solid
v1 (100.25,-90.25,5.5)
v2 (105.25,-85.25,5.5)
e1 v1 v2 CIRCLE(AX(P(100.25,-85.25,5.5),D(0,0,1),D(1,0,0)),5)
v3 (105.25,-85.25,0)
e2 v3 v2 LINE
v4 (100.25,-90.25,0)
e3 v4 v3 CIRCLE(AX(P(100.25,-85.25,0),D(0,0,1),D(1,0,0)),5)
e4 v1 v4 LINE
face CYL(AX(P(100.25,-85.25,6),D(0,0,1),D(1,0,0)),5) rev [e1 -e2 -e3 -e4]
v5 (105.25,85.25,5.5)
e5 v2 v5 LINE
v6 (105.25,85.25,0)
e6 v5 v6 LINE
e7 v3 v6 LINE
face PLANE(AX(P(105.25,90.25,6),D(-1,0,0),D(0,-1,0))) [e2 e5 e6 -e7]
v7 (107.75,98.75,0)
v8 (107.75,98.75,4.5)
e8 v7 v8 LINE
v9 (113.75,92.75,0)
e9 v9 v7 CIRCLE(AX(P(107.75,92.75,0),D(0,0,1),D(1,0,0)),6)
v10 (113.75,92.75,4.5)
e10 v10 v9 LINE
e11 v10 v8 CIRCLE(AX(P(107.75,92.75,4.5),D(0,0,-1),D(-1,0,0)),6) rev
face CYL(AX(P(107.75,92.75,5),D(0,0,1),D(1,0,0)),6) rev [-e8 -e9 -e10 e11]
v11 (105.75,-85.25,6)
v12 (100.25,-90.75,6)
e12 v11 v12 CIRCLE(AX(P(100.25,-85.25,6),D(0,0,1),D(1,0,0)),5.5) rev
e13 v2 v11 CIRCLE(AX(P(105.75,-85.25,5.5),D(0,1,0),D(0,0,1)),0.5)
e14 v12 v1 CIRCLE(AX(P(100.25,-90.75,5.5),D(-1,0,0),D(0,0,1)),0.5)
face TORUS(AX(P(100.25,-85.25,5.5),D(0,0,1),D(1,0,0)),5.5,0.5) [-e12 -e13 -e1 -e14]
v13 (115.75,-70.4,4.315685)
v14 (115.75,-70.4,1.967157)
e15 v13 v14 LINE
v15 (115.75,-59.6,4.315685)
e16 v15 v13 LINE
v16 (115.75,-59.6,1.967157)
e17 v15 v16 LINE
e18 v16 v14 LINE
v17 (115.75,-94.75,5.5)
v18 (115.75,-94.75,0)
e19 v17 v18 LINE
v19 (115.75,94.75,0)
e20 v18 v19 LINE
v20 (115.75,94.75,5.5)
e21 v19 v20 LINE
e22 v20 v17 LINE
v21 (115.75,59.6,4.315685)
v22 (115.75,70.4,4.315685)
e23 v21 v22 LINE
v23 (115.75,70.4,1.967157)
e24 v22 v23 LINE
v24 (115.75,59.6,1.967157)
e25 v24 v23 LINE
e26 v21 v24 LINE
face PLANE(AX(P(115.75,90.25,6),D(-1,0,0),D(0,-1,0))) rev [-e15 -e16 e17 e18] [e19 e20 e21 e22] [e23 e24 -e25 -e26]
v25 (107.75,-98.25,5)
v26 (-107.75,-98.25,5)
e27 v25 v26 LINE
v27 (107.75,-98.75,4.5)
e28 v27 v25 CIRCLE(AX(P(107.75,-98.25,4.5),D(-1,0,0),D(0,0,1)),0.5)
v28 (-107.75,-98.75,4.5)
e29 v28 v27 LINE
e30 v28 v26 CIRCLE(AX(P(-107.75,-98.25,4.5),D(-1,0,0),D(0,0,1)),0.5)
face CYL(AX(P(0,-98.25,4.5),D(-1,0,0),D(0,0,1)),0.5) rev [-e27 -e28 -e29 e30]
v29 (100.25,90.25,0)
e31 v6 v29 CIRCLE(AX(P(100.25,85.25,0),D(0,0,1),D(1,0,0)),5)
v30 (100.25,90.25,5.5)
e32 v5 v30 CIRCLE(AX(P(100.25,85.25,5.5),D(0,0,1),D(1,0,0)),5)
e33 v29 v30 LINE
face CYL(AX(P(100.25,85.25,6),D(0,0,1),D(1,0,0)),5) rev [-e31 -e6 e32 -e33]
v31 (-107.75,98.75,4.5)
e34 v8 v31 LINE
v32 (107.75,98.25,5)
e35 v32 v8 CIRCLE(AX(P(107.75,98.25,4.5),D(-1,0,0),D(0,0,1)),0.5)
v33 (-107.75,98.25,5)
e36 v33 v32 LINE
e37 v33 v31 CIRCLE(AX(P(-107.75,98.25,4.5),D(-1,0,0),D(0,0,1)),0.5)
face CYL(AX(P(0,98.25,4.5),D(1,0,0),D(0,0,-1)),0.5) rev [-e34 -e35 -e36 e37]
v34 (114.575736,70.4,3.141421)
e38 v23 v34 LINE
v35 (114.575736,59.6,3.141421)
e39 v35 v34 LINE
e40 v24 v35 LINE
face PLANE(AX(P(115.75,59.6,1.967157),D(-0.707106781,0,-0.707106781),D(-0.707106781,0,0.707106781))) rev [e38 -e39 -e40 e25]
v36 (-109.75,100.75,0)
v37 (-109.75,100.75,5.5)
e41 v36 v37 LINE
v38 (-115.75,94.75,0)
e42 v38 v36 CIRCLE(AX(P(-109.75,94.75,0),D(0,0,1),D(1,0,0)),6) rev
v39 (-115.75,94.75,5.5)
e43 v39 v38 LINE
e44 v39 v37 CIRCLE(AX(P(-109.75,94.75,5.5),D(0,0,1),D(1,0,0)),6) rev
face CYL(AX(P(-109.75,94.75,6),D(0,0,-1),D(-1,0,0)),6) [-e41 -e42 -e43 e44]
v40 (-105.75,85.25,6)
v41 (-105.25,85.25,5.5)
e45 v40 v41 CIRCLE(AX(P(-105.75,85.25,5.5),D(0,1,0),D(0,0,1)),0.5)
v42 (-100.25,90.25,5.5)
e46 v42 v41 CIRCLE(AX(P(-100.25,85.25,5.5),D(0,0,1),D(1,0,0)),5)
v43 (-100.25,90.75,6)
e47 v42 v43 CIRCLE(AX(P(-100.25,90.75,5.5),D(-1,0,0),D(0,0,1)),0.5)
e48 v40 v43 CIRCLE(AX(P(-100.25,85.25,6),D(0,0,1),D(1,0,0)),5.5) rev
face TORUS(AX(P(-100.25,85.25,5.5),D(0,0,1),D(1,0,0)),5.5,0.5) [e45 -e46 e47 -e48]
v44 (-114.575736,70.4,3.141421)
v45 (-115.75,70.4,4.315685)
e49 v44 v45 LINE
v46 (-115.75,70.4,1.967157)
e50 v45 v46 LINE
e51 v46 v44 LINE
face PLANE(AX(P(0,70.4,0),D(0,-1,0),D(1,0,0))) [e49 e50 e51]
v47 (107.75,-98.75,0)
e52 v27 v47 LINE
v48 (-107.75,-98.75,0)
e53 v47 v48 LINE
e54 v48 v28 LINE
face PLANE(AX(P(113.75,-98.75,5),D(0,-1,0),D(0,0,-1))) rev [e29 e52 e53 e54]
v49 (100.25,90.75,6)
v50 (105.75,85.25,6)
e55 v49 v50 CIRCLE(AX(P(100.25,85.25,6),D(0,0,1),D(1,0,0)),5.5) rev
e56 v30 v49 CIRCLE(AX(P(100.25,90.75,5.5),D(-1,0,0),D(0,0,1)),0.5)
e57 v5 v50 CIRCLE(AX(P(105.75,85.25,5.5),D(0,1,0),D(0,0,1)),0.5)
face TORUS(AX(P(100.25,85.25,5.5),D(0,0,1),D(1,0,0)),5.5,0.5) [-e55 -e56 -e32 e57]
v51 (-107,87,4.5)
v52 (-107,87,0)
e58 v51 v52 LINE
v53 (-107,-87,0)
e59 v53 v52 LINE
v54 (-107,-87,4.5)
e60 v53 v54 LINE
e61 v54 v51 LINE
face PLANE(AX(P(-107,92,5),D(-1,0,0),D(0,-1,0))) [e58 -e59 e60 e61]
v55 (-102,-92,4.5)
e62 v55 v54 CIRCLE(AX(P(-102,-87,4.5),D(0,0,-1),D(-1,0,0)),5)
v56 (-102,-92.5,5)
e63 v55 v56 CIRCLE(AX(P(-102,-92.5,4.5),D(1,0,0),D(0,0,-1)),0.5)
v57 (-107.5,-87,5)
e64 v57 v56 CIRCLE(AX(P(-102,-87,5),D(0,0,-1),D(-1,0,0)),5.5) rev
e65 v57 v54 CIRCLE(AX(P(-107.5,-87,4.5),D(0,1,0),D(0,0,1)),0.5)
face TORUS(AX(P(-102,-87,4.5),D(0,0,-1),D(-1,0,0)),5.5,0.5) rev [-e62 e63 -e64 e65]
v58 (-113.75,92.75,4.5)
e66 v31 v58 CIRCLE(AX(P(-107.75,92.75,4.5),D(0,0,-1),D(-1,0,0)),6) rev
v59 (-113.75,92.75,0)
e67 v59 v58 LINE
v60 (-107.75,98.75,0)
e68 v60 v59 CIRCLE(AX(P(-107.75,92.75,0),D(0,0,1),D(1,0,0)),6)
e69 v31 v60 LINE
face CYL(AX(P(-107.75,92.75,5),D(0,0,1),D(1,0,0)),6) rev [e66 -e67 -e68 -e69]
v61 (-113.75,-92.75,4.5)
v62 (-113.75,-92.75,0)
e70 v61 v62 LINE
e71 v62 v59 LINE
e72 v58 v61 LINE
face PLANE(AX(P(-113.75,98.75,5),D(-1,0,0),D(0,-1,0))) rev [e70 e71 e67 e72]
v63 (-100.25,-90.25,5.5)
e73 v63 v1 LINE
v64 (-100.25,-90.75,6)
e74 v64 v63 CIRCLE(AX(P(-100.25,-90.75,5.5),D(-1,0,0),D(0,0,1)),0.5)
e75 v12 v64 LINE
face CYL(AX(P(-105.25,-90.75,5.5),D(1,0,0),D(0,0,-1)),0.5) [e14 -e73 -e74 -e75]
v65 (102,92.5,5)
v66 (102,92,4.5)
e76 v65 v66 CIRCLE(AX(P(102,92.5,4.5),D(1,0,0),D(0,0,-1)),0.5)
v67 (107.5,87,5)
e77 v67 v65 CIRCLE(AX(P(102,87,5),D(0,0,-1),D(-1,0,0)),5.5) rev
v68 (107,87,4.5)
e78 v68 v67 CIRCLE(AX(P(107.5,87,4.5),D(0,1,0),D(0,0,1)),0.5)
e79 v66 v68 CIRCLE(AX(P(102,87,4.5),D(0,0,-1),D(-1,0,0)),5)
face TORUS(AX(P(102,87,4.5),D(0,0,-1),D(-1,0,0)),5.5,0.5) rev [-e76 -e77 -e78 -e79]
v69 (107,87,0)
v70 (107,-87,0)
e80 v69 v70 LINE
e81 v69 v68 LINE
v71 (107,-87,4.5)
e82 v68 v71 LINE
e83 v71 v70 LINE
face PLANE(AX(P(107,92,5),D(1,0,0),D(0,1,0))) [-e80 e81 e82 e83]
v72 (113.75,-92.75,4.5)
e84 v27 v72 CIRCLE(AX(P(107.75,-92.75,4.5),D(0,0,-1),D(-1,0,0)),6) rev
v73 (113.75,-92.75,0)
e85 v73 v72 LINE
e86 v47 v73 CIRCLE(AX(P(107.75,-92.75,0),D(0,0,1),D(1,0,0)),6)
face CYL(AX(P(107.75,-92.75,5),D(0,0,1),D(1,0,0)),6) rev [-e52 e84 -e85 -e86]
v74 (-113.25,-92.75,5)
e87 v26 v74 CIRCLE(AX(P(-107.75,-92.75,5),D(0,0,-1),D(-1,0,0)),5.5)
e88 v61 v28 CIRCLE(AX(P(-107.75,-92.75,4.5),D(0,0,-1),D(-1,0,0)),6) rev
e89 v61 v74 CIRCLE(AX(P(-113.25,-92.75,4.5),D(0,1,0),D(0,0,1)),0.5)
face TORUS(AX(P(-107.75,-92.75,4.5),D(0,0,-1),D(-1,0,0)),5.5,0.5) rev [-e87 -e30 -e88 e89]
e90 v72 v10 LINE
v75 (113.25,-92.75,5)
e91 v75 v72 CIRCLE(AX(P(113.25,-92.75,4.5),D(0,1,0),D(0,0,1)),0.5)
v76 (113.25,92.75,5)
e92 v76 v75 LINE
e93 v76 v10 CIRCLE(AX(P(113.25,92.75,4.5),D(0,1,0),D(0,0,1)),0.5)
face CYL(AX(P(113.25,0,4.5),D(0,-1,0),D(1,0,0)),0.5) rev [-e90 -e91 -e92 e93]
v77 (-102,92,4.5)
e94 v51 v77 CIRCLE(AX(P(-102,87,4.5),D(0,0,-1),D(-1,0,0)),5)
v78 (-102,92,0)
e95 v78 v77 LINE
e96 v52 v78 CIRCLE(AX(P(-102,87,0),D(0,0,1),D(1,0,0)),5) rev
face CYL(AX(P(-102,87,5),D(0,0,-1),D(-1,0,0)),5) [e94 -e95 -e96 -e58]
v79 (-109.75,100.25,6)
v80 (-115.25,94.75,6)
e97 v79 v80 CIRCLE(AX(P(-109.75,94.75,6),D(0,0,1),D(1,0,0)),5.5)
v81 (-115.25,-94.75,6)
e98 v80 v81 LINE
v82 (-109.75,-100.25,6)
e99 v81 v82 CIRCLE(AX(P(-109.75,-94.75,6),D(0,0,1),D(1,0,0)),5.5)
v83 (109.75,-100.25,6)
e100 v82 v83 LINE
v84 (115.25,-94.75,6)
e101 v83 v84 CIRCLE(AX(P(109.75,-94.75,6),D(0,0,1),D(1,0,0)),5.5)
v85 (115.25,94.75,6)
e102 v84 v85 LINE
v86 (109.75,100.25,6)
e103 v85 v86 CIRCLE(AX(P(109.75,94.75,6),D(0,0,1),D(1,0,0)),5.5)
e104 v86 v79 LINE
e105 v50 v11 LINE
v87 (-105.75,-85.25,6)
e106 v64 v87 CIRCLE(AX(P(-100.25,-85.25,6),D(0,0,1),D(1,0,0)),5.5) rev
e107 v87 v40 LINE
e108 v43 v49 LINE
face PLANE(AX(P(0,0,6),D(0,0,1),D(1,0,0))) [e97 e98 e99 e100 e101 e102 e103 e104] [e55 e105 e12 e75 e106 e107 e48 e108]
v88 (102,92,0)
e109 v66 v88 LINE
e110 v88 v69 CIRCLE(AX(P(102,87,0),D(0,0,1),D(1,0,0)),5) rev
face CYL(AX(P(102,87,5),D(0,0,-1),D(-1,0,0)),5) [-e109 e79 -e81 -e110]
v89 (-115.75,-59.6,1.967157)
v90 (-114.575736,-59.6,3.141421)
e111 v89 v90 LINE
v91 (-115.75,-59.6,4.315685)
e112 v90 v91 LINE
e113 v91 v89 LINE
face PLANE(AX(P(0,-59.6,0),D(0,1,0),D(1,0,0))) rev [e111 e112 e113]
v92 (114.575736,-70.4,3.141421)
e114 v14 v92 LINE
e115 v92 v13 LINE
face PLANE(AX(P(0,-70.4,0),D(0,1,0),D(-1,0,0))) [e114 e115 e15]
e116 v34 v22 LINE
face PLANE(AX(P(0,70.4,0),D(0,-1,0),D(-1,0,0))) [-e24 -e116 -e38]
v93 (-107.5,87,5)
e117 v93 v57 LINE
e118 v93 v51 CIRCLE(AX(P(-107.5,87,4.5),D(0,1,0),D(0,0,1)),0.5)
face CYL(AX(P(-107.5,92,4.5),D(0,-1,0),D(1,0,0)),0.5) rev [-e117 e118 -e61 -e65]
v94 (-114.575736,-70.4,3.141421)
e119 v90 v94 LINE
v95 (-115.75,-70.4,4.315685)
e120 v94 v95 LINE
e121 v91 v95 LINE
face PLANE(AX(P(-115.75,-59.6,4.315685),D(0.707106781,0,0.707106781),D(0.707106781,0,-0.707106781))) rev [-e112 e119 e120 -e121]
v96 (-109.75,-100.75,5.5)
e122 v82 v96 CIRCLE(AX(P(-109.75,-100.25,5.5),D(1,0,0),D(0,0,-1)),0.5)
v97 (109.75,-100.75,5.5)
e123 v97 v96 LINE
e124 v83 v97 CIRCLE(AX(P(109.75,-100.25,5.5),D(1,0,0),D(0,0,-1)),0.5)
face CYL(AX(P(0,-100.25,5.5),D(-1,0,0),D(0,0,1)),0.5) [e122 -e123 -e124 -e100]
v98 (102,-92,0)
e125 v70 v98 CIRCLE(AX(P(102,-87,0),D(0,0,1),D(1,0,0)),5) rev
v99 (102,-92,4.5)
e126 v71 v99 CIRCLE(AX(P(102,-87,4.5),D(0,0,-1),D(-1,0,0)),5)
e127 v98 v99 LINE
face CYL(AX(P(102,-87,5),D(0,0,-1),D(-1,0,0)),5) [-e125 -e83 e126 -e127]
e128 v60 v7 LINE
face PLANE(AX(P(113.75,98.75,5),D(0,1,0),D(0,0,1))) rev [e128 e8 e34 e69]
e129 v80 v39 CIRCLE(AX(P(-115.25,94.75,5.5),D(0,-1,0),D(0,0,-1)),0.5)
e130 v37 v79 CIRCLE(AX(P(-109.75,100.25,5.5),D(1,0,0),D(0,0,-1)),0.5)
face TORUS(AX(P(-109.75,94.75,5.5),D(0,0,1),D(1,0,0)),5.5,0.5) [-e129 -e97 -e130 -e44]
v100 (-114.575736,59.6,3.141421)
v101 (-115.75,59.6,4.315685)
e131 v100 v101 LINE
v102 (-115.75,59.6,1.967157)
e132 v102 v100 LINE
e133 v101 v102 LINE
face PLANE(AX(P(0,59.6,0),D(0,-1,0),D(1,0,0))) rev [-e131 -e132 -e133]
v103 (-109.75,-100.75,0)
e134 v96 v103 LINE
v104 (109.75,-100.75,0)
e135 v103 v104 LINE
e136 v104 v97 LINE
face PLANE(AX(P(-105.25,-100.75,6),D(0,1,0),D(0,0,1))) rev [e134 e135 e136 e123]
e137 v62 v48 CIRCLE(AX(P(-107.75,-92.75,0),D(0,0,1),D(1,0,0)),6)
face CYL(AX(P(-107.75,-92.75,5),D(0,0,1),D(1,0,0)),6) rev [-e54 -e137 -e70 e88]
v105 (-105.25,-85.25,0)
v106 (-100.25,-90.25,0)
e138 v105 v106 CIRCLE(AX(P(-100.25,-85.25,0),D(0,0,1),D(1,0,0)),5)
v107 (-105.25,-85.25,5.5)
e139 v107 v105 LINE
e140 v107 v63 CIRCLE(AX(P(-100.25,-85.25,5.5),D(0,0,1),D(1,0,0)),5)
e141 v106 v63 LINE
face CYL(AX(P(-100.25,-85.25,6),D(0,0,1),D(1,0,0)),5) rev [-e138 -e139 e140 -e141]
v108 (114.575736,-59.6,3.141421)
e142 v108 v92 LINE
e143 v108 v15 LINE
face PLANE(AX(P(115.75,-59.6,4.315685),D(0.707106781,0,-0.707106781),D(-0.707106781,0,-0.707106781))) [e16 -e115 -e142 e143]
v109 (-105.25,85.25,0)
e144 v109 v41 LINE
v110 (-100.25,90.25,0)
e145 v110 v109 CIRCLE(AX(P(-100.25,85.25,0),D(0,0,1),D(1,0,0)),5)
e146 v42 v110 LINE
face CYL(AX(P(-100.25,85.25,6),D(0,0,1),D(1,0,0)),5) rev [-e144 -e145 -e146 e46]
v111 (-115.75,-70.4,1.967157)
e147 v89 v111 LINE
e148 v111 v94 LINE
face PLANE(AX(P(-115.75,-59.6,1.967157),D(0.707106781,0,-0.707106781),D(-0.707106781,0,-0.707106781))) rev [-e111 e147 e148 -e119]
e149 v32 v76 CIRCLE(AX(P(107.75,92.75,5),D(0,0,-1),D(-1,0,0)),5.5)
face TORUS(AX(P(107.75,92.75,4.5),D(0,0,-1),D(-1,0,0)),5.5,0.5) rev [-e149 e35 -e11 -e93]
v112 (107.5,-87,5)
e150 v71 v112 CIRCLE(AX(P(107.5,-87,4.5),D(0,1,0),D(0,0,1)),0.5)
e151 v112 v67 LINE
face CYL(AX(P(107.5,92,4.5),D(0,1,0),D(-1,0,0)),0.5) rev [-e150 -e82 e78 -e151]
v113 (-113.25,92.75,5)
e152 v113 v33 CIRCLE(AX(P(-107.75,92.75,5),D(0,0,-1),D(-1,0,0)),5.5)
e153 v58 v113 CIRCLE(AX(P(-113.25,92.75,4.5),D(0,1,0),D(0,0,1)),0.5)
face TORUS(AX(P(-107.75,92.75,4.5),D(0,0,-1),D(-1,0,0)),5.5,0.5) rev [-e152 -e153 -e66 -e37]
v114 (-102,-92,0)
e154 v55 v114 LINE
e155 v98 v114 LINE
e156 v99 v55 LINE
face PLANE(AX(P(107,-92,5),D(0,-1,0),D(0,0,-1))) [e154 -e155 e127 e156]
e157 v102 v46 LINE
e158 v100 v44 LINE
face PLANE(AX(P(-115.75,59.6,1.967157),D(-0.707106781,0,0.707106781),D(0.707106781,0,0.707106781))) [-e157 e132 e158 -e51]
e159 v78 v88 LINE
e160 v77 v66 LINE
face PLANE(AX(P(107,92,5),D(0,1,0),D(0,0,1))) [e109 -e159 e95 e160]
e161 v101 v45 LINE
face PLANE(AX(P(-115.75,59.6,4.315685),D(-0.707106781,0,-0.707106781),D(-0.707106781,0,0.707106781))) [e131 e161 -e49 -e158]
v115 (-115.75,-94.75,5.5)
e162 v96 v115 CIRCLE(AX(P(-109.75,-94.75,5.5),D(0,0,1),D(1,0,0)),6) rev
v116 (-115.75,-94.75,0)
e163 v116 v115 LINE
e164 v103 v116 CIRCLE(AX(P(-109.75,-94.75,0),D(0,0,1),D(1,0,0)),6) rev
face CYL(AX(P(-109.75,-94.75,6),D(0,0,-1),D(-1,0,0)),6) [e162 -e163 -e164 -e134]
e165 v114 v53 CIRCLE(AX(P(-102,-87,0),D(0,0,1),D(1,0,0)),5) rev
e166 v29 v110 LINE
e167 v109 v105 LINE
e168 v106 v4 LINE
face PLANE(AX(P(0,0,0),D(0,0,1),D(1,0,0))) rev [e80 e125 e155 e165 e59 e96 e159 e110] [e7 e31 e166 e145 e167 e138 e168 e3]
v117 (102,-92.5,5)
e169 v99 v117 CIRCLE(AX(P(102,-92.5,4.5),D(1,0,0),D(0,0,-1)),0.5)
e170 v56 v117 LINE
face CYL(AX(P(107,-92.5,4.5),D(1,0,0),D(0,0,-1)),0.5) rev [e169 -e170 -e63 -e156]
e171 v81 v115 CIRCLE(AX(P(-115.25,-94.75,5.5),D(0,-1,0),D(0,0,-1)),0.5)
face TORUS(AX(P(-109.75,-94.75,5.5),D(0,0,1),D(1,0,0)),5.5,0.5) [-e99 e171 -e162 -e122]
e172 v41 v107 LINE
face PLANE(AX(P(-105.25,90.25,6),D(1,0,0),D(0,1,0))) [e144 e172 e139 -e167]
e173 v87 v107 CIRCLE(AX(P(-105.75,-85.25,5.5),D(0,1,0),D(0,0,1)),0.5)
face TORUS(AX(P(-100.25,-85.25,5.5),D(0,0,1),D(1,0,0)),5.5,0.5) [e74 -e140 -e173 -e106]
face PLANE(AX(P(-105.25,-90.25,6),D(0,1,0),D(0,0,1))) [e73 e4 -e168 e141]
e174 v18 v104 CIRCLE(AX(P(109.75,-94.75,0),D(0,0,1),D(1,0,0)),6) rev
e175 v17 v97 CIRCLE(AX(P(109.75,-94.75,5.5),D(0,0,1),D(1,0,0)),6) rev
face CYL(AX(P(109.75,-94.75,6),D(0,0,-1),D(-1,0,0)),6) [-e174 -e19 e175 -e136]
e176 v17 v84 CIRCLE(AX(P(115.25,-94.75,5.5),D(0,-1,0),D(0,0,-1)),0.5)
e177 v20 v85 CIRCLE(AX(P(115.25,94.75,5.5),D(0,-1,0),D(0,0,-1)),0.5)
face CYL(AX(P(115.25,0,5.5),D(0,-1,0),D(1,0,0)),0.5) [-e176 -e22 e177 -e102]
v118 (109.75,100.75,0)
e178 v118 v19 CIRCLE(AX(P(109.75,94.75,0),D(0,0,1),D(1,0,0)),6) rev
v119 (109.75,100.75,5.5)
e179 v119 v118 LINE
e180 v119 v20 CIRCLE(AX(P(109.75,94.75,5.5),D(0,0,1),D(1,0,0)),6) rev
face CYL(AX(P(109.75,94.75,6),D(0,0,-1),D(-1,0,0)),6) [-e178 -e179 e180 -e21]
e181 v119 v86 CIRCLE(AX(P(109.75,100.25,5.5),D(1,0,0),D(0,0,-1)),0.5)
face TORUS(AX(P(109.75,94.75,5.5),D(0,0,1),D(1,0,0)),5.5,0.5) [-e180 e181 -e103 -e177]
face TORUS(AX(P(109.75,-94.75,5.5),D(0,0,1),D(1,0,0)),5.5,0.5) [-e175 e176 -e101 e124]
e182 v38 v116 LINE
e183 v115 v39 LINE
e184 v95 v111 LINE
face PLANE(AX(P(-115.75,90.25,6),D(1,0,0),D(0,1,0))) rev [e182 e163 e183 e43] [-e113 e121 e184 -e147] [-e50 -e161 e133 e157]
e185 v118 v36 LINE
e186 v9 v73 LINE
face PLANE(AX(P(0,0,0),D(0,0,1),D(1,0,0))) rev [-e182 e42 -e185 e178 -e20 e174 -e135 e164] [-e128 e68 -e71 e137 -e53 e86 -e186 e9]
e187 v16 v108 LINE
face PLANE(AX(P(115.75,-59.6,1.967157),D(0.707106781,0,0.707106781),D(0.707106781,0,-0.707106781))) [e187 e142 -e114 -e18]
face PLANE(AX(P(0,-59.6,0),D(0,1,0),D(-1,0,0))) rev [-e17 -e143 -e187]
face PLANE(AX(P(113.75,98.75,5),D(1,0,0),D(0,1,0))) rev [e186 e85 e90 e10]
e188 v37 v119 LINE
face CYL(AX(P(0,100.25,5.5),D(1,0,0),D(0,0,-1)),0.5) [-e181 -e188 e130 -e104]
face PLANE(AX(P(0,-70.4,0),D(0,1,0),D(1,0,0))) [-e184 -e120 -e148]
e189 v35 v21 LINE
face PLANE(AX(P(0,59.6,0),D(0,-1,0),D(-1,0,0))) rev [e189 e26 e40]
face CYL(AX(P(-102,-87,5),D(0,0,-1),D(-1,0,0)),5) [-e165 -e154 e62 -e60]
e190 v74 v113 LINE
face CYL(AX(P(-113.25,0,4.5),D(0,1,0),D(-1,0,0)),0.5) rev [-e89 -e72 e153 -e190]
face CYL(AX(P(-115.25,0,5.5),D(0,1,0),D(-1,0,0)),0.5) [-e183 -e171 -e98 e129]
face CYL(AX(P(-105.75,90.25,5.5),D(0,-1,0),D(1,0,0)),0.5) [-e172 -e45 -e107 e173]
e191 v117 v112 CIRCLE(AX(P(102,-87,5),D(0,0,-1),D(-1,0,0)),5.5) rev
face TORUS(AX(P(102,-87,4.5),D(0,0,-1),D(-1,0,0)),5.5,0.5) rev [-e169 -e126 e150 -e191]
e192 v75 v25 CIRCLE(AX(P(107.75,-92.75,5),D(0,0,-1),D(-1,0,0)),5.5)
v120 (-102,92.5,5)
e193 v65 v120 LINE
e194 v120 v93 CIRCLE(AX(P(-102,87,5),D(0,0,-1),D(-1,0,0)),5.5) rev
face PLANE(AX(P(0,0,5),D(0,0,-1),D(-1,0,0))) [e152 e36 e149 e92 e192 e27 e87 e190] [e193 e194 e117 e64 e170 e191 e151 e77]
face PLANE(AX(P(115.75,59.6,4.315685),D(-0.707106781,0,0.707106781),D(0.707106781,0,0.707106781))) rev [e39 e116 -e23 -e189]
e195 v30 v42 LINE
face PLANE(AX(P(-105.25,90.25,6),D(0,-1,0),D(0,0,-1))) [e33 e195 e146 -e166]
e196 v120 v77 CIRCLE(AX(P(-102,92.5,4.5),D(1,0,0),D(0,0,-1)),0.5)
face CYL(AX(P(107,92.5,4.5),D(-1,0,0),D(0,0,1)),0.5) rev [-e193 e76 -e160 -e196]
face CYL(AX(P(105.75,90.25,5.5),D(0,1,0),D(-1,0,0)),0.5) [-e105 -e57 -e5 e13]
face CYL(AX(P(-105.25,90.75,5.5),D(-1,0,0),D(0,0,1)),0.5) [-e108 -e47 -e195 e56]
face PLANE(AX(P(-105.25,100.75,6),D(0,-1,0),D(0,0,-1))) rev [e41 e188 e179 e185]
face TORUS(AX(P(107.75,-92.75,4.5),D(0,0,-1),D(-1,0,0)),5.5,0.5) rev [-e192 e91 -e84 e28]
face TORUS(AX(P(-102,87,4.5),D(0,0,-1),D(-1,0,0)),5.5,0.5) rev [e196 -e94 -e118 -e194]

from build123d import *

# Parameters (mm, degrees)
SKETCH1_W                                = 231.5
SKETCH1_H                                = 201.5
SKETCH1_W_2                              = 210.5
SKETCH1_H_2                              = 180.5
MAIN_BODY_DEPTH                          = 6
FILLET1_R                                = 5
FILLET2_R                                = 6
SKETCH3_W                                = 227.5
SKETCH3_H                                = 197.5
SKETCH3_W_2                              = 214
SKETCH3_H_2                              = 184
MAIN_CAVITY_DEPTH                        = 5
FILLET6_R                                = 6
FILLET4_R                                = 5
CAVITY1_START                            = 83.43860018
CAVITY1_OUTLINE_W                        = 1.804040507
CAVITY1_OUTLINE_H                        = 10
CAVITY1_DEPTH                            = 1.060660172
CAVITY1_START_2                          = -80.256619665
CAVITY1_2_OUTLINE_W                      = 1.56139982
CAVITY1_2_OUTLINE_H                      = 10
CAVITY1_2_DEPTH                          = 1.060660172
SNAP_START                               = -0.4
SNAP_FIT_DEPTH                           = 10.8
MIRROR1_START                            = -0.4
MIRROR1_AT_THE_SECOND_PLANE_COPY_1_DEPTH = 10.8
FILLET7_R                                = 0.5


# Read off the part's stored shape, not the designer's step: Cavity1
with BuildPart() as part:
    # Sketch1 → Main Body (new body)
    with BuildSketch(Plane.XY):
        Rectangle(SKETCH1_W, SKETCH1_H)
        Rectangle(SKETCH1_W_2, SKETCH1_H_2, mode=Mode.SUBTRACT)
    extrude(amount=MAIN_BODY_DEPTH)

    # Fillet1
    fillet1_edges = [part.edges().sort_by_distance(p)[0] for p in [
        (105.25, -90.25, 3),
        (105.25, 90.25, 3),
        (-105.25, 90.25, 3),
        (-105.25, -90.25, 3),
    ]]
    fillet(fillet1_edges, radius=FILLET1_R)

    # Fillet2
    fillet2_edges = [part.edges().sort_by_distance(p)[0] for p in [
        (115.75, -100.75, 3),
        (-115.75, -100.75, 3),
        (-115.75, 100.75, 3),
        (115.75, 100.75, 3),
    ]]
    fillet(fillet2_edges, radius=FILLET2_R)

    # Sketch3 → Main Cavity (cut)
    with BuildSketch(Plane(origin=(0, 0, 0), x_dir=(-1, 0, 0), z_dir=(0, 0, -1))):
        Rectangle(SKETCH3_W, SKETCH3_H)
        Rectangle(SKETCH3_W_2, SKETCH3_H_2, mode=Mode.SUBTRACT)
    extrude(amount=-MAIN_CAVITY_DEPTH, mode=Mode.SUBTRACT)

    # Fillet6
    fillet6_edges = [part.edges().sort_by_distance(p)[0] for p in [
        (-113.75, 98.75, 2.5),
        (-113.75, -98.75, 2.5),
        (113.75, -98.75, 2.5),
        (113.75, 98.75, 2.5),
    ]]
    fillet(fillet6_edges, radius=FILLET6_R)

    # Fillet4
    fillet4_edges = [part.edges().sort_by_distance(p)[0] for p in [
        (-107, -92, 2.5),
        (107, -92, 2.5),
        (107, 92, 2.5),
        (-107, 92, 2.5),
    ]]
    fillet(fillet4_edges, radius=FILLET4_R)

    # Cavity1 outline → Cavity1 (cut)
    with BuildSketch(Plane(origin=(0, 0, 0), x_dir=(0.7071067811865474, 0, -0.7071067811865477), z_dir=(0.7071067811865476, 0, 0.7071067811865476)).offset(CAVITY1_START)):
        with Locations((80.097979747, 65)):
            Rectangle(CAVITY1_OUTLINE_W, CAVITY1_OUTLINE_H)
        with Locations((80.097979747, -65)):
            Rectangle(CAVITY1_OUTLINE_W, CAVITY1_OUTLINE_H)
    extrude(amount=CAVITY1_DEPTH, mode=Mode.SUBTRACT)

    # Cavity1 2 outline → Cavity1 2 (cut)
    with BuildSketch(Plane(origin=(0, 0, 0), x_dir=(0.7071067811865474, 0, -0.7071067811865477), z_dir=(0.7071067811865476, 0, 0.7071067811865476)).offset(CAVITY1_START_2)):
        with Locations((-84.21930009, 65)):
            Rectangle(CAVITY1_2_OUTLINE_W, CAVITY1_2_OUTLINE_H)
        with Locations((-84.21930009, -65)):
            Rectangle(CAVITY1_2_OUTLINE_W, CAVITY1_2_OUTLINE_H)
    extrude(amount=CAVITY1_2_DEPTH, mode=Mode.SUBTRACT)

    # Sketch4 → Snap Fit (cut)
    with BuildSketch(Plane.XZ.offset(-70).offset(SNAP_START)):
        Polygon((-115.75, 4.315685425), (-114.575735931, 3.141421356), (-115.75, 1.967157288), align=None)
    snap_fit = extrude(amount=SNAP_FIT_DEPTH, mode=Mode.SUBTRACT)

    # Mirror1: Snap Fit across plane
    add(snap_fit.mirror(Plane.ZX), mode=Mode.SUBTRACT)

    # Mirror1 at the second plane: Snap Fit across plane
    add(snap_fit.mirror(Plane(origin=(0, 0, 0), x_dir=(0, 0, 1), z_dir=(1, 0, 0))), mode=Mode.SUBTRACT)

    # Mirror1 at the second plane copy 1 sketc → Mirror1 at the second plane copy 1 (cut)
    with BuildSketch(Plane(origin=(0, -70, 0), x_dir=(-1, 0, 0), z_dir=(0, 1, 0)).offset(MIRROR1_START)):
        Polygon((-115.75, 4.315685425), (-114.575735931, 3.141421356), (-115.75, 1.967157288), align=None)
    extrude(amount=MIRROR1_AT_THE_SECOND_PLANE_COPY_1_DEPTH, mode=Mode.SUBTRACT)

    # Fillet7
    fillet7_edges = [part.edges().sort_by_distance(p)[0] for p in [
        (-113.75, 0, 5),
        (0, -98.75, 5),
        (0, 98.75, 5),
        (113.75, 0, 5),
        (-111.992640687, 96.992640687, 5),
        (111.992640687, 96.992640687, 5),
        (111.992640687, -96.992640687, 5),
        (-111.992640687, -96.992640687, 5),
        (107, 0, 5),
        (0, -92, 5),
        (0, 92, 5),
        (-107, 0, 5),
        (105.535533906, -90.535533906, 5),
        (105.535533906, 90.535533906, 5),
        (-105.535533906, 90.535533906, 5),
        (-105.535533906, -90.535533906, 5),
        (105.25, 0, 6),
        (0, 90.25, 6),
        (0, -90.25, 6),
        (-105.25, 0, 6),
        (103.785533906, 88.785533906, 6),
        (103.785533906, -88.785533906, 6),
        (-103.785533906, -88.785533906, 6),
        (-103.785533906, 88.785533906, 6),
        (0, 100.75, 6),
        (115.75, 0, 6),
        (-115.75, 0, 6),
        (0, -100.75, 6),
        (-113.992640687, 98.992640687, 6),
        (-113.992640687, -98.992640687, 6),
        (113.992640687, -98.992640687, 6),
        (113.992640687, 98.992640687, 6),
    ]]
    fillet(fillet7_edges, radius=FILLET7_R)


solid = part.part
